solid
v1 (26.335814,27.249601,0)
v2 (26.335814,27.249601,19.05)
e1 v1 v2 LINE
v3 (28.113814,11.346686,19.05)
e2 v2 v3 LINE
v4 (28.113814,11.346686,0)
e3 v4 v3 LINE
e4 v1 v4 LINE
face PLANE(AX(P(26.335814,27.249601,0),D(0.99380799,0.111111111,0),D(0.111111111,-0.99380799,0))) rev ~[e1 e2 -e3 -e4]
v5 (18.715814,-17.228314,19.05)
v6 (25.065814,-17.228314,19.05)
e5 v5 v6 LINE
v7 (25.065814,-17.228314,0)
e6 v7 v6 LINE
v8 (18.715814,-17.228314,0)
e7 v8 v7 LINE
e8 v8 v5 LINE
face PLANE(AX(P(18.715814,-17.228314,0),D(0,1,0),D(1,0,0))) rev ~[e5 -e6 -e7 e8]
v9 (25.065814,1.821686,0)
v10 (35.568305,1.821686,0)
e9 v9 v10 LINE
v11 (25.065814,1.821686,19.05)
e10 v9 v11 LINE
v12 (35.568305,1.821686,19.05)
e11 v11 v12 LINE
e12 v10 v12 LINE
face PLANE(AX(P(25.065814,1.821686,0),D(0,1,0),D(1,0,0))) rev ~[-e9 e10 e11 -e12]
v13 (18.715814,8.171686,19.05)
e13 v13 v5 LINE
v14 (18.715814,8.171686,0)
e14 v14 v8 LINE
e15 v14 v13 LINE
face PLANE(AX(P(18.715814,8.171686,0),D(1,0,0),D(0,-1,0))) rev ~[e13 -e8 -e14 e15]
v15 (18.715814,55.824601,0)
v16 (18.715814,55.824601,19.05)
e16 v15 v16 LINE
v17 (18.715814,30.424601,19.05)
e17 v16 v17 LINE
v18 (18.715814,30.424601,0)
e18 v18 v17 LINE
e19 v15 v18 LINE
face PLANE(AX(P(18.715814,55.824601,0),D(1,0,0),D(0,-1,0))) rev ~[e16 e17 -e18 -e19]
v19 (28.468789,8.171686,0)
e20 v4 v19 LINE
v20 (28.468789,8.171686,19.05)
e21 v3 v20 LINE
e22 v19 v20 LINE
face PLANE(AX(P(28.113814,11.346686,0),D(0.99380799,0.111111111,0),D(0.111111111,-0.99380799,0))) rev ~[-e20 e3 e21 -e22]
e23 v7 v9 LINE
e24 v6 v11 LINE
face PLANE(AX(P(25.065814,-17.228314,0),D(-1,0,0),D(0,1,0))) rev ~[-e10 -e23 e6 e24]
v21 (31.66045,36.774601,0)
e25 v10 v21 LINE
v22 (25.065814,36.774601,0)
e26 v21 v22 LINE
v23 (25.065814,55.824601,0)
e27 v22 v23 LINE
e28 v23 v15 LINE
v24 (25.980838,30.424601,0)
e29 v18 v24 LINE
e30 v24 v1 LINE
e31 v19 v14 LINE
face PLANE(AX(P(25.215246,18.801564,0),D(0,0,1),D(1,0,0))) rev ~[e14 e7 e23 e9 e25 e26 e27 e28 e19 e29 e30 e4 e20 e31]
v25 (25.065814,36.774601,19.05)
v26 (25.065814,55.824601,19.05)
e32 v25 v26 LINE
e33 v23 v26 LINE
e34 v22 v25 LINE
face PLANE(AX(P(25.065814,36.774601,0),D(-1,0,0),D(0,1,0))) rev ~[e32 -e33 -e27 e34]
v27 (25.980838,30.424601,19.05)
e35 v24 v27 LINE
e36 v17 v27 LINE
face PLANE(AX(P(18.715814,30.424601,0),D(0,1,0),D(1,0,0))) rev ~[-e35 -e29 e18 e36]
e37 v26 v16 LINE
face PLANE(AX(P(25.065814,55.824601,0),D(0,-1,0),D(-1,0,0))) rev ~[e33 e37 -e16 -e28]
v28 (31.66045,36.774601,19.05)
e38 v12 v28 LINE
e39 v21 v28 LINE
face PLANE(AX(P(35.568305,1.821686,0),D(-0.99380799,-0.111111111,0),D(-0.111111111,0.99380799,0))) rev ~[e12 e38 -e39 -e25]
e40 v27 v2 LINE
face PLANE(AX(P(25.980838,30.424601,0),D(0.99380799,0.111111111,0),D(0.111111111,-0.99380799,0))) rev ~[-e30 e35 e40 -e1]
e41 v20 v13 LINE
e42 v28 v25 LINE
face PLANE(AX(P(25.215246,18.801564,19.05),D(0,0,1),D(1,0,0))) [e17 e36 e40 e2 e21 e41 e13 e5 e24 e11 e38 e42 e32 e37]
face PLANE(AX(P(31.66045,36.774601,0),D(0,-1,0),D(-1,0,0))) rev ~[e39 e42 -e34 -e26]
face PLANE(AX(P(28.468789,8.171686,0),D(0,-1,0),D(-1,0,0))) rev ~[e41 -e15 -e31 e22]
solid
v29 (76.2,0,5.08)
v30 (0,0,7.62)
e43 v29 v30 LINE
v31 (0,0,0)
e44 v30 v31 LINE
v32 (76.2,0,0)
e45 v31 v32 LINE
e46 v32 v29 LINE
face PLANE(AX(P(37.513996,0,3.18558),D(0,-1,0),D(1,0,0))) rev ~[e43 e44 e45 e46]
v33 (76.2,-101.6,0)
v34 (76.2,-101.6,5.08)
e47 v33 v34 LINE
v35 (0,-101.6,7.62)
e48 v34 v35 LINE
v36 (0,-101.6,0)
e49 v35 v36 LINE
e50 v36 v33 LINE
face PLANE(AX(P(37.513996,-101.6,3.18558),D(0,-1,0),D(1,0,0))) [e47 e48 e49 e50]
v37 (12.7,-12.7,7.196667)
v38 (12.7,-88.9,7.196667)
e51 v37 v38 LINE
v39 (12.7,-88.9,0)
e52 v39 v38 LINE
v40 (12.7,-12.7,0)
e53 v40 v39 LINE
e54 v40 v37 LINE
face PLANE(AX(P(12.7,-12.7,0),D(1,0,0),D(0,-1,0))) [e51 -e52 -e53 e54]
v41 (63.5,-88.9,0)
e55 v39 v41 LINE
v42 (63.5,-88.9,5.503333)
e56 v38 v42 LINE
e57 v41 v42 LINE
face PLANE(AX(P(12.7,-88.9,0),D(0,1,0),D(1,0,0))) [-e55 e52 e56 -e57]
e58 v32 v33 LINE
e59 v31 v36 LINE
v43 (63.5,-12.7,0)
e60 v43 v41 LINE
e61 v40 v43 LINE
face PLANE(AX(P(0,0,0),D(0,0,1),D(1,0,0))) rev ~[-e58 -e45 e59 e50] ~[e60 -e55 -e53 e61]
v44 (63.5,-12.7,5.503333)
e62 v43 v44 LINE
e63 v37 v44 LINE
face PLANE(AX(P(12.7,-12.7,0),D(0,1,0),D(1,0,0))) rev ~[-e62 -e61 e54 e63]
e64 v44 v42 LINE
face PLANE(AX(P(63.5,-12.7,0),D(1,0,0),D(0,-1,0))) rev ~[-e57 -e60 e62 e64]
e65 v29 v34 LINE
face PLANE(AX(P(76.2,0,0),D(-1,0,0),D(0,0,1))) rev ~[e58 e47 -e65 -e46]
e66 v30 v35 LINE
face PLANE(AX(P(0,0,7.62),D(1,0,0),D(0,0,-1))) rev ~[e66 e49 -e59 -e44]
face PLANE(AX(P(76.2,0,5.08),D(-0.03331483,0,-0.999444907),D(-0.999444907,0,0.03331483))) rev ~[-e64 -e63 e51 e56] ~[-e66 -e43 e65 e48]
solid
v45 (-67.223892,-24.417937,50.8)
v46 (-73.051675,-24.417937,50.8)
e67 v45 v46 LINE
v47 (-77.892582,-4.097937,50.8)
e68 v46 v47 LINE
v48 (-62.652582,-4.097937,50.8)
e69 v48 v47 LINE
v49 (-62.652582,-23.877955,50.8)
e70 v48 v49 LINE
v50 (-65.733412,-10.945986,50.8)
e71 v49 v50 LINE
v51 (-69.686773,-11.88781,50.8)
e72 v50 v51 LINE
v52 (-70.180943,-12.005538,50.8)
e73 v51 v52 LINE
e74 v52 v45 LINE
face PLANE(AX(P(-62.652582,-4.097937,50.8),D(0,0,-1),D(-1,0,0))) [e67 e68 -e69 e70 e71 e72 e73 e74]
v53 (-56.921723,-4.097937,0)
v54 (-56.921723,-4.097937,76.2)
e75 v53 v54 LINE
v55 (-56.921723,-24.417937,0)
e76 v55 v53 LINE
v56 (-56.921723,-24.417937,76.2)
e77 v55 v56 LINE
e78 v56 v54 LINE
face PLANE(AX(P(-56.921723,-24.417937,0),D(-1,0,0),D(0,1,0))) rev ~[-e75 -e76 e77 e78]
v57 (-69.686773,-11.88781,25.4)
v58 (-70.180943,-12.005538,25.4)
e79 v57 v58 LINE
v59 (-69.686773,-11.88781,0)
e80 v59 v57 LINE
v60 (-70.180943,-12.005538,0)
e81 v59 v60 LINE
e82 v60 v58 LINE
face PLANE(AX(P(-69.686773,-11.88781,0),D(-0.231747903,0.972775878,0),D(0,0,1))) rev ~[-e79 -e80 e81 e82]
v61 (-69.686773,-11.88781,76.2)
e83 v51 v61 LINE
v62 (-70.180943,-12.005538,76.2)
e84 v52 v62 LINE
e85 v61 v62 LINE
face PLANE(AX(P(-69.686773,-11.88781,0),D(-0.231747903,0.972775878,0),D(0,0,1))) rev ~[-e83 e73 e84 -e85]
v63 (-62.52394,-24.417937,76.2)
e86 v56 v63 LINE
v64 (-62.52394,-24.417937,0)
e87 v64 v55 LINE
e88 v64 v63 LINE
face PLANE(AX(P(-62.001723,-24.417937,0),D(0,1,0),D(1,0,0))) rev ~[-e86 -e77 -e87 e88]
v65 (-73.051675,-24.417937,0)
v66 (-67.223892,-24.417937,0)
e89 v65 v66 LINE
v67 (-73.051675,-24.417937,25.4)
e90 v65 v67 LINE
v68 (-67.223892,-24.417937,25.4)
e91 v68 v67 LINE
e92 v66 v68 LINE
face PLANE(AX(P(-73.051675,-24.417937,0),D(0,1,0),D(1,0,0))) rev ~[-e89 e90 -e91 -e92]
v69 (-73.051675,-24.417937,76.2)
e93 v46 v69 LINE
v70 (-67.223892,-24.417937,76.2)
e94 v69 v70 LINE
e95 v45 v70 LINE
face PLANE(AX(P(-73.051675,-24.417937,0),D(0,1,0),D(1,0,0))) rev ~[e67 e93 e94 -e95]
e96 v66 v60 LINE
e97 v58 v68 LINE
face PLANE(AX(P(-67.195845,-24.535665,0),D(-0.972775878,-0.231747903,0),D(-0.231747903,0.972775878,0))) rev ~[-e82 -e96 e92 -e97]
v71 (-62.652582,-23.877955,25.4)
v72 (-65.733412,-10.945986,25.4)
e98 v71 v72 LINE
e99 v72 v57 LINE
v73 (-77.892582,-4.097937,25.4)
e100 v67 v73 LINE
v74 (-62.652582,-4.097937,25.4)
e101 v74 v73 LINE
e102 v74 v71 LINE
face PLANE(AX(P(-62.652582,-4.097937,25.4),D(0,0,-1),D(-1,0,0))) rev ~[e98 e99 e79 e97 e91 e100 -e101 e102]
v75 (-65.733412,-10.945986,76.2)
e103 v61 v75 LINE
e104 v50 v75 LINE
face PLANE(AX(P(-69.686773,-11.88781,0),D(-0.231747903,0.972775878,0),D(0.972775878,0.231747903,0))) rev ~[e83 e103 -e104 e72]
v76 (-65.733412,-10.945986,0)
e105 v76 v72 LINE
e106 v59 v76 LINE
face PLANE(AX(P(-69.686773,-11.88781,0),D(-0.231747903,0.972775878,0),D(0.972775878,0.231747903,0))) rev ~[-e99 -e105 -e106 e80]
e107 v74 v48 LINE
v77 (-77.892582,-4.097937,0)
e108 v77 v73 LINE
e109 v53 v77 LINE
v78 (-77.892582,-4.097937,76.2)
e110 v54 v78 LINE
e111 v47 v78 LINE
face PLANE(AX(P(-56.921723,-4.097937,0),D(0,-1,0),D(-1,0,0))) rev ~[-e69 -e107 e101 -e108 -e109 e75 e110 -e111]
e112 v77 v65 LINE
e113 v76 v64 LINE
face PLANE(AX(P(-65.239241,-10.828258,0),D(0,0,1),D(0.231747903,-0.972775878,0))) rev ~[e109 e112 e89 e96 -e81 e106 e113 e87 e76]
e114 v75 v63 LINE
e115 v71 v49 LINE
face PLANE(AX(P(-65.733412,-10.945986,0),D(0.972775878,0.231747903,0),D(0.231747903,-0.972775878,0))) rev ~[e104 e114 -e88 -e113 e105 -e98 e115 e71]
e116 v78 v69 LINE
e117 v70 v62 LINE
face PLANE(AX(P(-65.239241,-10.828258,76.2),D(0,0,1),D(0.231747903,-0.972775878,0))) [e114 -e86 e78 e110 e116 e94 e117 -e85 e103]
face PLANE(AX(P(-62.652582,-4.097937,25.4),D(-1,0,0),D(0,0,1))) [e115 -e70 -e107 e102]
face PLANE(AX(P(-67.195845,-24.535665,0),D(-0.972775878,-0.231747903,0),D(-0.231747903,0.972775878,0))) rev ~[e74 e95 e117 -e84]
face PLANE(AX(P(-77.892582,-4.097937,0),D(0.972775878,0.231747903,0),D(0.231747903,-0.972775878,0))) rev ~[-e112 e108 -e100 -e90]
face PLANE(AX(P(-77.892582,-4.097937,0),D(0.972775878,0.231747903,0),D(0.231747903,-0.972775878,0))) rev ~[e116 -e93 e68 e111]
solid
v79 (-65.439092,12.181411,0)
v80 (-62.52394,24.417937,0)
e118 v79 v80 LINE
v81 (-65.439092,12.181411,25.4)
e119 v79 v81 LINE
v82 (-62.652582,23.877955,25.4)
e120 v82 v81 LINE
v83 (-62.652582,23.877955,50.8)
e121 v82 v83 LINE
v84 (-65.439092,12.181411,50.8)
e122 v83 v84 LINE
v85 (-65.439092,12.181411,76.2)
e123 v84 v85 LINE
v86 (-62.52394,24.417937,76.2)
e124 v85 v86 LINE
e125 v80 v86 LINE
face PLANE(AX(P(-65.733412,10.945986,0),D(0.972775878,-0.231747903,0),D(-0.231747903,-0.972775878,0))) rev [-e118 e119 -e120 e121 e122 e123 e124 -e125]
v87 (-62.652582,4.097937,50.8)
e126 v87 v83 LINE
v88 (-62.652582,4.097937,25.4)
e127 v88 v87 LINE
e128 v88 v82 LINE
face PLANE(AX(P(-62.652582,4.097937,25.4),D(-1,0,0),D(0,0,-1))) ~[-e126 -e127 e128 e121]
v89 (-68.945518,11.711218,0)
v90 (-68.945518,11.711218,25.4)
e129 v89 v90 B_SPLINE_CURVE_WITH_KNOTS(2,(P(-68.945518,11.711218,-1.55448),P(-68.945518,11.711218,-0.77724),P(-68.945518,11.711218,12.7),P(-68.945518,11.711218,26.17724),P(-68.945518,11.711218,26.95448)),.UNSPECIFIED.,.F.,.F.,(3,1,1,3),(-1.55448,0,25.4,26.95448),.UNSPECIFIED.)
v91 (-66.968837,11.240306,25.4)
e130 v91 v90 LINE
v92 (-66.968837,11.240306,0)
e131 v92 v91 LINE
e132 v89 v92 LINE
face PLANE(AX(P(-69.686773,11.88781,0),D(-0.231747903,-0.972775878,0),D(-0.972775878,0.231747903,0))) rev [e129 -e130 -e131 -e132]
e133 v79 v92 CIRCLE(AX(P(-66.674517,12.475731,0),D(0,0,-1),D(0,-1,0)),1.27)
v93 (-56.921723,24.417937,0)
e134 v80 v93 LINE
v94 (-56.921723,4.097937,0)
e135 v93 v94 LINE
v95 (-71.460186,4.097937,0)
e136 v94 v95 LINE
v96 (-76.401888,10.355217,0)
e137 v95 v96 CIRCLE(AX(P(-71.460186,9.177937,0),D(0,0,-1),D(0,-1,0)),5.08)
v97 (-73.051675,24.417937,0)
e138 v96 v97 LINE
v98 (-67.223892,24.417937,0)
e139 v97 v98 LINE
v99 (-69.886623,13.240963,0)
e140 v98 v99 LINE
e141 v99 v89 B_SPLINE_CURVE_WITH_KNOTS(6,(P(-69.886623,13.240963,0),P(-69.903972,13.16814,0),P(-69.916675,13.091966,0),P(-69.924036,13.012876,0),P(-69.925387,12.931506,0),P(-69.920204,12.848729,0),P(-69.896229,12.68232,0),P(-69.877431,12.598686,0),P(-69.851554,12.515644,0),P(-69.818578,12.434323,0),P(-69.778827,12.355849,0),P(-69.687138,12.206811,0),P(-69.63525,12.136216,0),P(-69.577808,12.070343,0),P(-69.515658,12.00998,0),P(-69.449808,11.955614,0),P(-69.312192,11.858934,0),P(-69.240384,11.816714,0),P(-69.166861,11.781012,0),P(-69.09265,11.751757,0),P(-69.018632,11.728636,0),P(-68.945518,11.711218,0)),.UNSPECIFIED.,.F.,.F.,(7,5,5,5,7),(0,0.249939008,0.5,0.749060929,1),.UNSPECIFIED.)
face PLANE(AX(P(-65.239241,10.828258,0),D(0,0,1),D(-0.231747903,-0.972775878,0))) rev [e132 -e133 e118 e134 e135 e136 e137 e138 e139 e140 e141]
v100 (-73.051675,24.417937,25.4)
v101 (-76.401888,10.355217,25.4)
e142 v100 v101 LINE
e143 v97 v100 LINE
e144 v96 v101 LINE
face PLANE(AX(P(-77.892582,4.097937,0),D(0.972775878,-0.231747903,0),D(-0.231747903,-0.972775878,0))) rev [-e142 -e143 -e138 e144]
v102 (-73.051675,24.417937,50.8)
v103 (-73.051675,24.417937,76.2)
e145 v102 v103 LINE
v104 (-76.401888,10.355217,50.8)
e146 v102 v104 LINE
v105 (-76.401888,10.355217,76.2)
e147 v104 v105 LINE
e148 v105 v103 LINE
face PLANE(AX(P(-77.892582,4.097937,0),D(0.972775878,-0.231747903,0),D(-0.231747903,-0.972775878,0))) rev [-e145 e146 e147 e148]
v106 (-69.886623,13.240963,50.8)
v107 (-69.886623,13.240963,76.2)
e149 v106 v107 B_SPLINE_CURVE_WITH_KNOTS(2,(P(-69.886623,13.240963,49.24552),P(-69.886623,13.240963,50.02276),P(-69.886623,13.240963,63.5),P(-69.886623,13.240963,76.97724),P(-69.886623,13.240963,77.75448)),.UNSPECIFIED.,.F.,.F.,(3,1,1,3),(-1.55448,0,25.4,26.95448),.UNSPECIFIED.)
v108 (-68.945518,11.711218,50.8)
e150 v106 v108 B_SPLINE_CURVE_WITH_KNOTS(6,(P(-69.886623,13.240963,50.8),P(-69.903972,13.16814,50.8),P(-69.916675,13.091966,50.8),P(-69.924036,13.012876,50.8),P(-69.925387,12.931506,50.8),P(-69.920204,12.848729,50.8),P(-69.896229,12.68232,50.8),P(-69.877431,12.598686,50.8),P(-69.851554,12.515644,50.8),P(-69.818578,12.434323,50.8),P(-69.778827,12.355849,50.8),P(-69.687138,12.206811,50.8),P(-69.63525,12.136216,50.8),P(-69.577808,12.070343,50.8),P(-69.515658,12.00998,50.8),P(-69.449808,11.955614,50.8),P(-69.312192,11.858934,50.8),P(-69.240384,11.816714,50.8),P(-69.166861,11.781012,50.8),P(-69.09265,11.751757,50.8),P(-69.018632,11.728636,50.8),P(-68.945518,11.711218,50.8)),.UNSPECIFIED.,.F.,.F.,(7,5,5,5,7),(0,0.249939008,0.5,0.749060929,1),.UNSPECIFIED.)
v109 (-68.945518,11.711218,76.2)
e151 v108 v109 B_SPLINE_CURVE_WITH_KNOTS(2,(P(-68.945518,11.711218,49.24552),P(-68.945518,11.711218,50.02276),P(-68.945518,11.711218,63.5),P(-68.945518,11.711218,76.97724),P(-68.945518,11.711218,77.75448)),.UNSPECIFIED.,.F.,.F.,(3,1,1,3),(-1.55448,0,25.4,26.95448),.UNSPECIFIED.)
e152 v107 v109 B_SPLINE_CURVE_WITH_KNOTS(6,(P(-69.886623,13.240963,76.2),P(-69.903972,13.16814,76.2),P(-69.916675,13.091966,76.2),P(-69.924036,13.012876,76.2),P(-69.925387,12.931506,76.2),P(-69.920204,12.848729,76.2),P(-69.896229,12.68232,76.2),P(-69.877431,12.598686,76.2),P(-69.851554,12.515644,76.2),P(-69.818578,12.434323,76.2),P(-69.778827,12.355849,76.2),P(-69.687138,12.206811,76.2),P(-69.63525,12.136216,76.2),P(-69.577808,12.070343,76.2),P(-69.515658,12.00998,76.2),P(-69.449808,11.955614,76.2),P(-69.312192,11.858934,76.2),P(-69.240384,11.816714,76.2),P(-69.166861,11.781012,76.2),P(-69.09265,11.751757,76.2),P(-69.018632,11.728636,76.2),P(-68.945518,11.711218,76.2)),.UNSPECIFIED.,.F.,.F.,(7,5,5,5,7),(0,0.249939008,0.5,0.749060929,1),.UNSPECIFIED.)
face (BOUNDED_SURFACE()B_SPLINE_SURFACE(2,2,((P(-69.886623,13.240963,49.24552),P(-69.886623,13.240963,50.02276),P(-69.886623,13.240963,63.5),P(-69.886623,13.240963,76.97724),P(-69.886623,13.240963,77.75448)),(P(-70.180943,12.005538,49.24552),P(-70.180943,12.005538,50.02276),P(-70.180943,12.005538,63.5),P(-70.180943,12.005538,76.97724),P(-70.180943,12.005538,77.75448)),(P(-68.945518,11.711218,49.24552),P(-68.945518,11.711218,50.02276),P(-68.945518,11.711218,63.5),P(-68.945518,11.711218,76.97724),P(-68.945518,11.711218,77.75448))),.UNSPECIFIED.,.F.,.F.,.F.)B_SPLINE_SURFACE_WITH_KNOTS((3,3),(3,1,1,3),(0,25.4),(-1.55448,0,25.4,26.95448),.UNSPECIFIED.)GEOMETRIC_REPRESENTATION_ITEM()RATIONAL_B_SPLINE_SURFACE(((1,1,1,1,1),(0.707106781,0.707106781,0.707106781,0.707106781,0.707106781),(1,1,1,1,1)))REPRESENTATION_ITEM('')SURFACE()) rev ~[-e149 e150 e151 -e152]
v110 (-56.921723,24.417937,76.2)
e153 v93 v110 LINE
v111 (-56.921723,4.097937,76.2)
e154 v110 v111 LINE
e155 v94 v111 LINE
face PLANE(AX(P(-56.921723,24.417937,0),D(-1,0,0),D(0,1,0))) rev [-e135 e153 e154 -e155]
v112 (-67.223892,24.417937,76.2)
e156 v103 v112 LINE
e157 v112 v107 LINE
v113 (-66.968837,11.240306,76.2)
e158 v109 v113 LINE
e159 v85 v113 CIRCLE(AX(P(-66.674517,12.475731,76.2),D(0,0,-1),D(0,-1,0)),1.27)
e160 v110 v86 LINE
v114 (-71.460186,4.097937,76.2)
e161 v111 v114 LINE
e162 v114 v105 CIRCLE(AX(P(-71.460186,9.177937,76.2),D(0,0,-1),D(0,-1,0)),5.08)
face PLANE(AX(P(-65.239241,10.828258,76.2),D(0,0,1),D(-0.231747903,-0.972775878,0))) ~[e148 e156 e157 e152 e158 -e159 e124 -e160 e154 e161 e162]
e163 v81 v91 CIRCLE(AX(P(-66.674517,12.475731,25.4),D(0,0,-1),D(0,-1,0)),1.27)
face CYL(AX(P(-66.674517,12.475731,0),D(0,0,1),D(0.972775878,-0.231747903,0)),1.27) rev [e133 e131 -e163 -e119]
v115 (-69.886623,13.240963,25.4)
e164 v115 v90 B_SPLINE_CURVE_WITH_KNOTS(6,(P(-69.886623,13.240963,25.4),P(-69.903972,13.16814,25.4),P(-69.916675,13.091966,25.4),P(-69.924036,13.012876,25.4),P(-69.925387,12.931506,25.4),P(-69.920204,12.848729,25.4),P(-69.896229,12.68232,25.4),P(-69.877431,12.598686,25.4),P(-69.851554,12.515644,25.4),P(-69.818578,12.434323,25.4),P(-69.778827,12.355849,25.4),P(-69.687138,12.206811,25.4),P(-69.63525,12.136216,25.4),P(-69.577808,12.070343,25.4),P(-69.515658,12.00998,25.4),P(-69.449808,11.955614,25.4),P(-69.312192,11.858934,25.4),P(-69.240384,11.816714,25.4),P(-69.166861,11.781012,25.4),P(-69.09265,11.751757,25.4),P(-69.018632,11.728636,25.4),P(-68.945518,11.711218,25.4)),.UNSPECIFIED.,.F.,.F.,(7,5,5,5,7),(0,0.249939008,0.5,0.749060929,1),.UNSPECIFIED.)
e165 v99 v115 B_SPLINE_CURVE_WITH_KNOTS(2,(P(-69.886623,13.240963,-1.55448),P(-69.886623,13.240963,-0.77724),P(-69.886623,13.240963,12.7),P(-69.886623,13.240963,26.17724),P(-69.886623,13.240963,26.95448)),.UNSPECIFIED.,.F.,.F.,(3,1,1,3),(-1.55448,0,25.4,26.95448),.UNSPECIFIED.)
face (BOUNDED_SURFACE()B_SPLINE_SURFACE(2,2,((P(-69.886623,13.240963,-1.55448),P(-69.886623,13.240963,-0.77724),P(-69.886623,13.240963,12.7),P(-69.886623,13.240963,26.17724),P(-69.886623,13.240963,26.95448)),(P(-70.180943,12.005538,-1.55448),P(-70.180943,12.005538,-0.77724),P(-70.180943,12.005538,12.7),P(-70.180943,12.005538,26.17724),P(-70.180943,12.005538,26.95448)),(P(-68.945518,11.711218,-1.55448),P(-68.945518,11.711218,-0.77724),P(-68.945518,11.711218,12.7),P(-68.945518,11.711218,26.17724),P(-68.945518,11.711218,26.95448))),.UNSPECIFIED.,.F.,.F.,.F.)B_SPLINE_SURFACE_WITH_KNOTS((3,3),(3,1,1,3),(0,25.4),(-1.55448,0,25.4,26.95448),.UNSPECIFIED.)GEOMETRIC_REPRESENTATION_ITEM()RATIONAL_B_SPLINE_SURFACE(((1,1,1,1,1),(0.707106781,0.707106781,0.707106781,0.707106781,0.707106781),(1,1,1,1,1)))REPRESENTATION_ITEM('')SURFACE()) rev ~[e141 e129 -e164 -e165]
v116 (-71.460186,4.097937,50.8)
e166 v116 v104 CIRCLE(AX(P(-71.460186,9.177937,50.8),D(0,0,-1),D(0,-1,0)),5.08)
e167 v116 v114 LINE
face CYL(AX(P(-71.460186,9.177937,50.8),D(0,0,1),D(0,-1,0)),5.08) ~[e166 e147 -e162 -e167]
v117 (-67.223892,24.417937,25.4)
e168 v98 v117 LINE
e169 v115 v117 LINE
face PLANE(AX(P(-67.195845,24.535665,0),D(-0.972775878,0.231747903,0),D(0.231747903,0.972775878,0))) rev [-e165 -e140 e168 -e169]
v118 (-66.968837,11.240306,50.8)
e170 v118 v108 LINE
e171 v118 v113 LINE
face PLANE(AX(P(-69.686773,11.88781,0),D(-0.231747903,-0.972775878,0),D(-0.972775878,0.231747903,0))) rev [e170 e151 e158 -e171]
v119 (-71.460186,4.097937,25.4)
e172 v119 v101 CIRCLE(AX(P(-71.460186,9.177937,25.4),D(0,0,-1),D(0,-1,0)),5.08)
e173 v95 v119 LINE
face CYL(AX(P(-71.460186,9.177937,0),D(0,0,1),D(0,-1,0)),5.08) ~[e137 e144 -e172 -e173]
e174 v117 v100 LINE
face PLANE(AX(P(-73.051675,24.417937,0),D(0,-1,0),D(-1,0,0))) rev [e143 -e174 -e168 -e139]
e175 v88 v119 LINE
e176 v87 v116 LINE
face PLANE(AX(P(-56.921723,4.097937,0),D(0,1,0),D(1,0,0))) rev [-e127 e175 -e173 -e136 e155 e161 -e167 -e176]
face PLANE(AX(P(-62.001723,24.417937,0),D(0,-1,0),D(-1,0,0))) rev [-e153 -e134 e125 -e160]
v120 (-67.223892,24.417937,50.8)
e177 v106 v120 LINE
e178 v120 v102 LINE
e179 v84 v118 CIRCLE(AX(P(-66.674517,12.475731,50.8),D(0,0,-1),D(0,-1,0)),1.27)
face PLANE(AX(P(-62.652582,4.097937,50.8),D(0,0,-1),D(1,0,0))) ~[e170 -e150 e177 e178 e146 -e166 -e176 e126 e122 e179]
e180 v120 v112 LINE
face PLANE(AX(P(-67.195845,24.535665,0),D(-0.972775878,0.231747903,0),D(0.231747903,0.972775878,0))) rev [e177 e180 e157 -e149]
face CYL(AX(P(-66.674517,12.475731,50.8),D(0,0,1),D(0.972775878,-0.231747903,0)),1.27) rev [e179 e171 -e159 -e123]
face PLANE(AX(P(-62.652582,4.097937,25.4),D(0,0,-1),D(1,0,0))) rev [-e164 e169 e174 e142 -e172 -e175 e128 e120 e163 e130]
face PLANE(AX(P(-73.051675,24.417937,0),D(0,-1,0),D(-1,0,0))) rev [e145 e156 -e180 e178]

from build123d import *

# Parameters (mm, degrees)
F1_DEPTH  = 101.6
F2_W      = 50.8
F2_H      = 76.2
F3_DEPTH  = 7.621
F5_DEPTH  = 19.05
F7_DEPTH  = 76.2
F9_DEPTH  = 0.508
F10_DEPTH = 0.508
F12_DEPTH = 76.201
F8_W      = 15.24
F8_H      = 25.4
F13_DEPTH = 97.503062818
F15_R     = 5.08
F16_R     = 1.27


with BuildPart() as f1:
    # F0 (on Front) → F1 (new body)
    with BuildSketch(Plane.XZ):
        Polygon((0, 7.62), (0, 0), (76.2, 0), (76.2, 5.08), align=None)
    extrude(amount=F1_DEPTH)

    # F2 (on face) → F3 (cut, through all)
    with BuildSketch(Plane(origin=(0, 0, 0), x_dir=(1, 0, 0), z_dir=(0, 0, -1))):
        with Locations((38.1, 50.8)):
            Rectangle(F2_W, F2_H)
    extrude(amount=-F3_DEPTH, mode=Mode.SUBTRACT)


with BuildPart() as f5:
    # F4 (on Top) → F5 (new body)
    with BuildSketch(Plane.XY):
        Polygon((25.0658135089, 55.8246009568), (18.7158135089, 55.8246009568), (18.7158135089, 30.4246009568), (25.9808377175, 30.4246009568), (26.3358135089, 27.2496009568), (28.1138135089, 11.3466855008), (28.4687893003, 8.1716855008), (18.7158135089, 8.1716855008), (18.7158135089, -17.2283144992), (25.0658135089, -17.2283144992), (25.0658135089, 1.8216855008), (35.5683051289, 1.8216855008), (31.6604503803, 36.7746009568), (25.0658135089, 36.7746009568), align=None)
    extrude(amount=F5_DEPTH)


with BuildPart() as f7:
    # F6 (on Top) → F7 (new body)
    with BuildSketch(Plane.XY):
        Polygon((-62.001723196, -24.417937182), (-56.921723196, -24.417937182), (-56.921723196, -4.097937182), (-77.8925820998, -4.097937182), (-73.0516752635, -24.417937182), (-66.7016752635, -24.417937182), (-69.686772723, -11.8878095782), (-65.2392414078, -10.8282581634), align=None)
    extrude(amount=F7_DEPTH)

    # F9 (add): a face of the model
    f9_faces = [f7.faces().sort_by_distance(p)[0] for p in [
        (-63.6204823019, -17.6230976727, 38.1),
    ]]
    extrude(f9_faces, amount=F9_DEPTH)

    # F10 (cut): a face of the model
    f10_faces = [f7.faces().sort_by_distance(p)[0] for p in [
        (-68.1942239932, -18.1528733801, 38.1),
    ]]
    extrude(f10_faces, amount=-F10_DEPTH, mode=Mode.SUBTRACT)

    # F11 (on face) → F12 (cut, through all)
    with BuildSketch(Plane(origin=(0, 0, 0), x_dir=(1, 0, 0), z_dir=(0, 0, -1))):
        Polygon((-62.5239400924, 24.417937182), (-62.001723196, 24.417937182), (-62.4958933421, 24.5356651169), align=None)
        Polygon((-63.2905851658, 24.417937182), (-62.5239400924, 24.417937182), (-62.4958933421, 24.5356651169), align=None)
    extrude(amount=-F12_DEPTH, mode=Mode.SUBTRACT)

    # F8 (on face) → F13 (cut, through all)
    with BuildSketch(Plane(origin=(0, -4.097937182, 0), x_dir=(-1, 0, 0), z_dir=(0, 1, 0))):
        with Locations((70.2725820998, 38.1)):
            Rectangle(F8_W, F8_H)
    extrude(amount=-F13_DEPTH, mode=Mode.SUBTRACT)


with BuildPart() as f14_1:
    # F14: instance of F7
    add(f7.part.mirror(Plane.XZ))

    # F15
    f15_edges = [f14_1.edges().sort_by_distance(p)[0] for p in [
        (-77.892582, 4.097937, 12.7),
        (-77.892582, 4.097937, 63.5),
    ]]
    fillet(f15_edges, radius=F15_R)

    # F16
    f16_edges = [f14_1.edges().sort_by_distance(p)[0] for p in [
        (-65.733412, 10.945986, 63.5),
        (-65.733412, 10.945986, 12.7),
        (-70.180943, 12.005538, 12.7),
        (-70.180943, 12.005538, 63.5),
    ]]
    fillet(f16_edges, radius=F16_R)


solid = Compound([f1.part, f5.part, f7.part, f14_1.part])
